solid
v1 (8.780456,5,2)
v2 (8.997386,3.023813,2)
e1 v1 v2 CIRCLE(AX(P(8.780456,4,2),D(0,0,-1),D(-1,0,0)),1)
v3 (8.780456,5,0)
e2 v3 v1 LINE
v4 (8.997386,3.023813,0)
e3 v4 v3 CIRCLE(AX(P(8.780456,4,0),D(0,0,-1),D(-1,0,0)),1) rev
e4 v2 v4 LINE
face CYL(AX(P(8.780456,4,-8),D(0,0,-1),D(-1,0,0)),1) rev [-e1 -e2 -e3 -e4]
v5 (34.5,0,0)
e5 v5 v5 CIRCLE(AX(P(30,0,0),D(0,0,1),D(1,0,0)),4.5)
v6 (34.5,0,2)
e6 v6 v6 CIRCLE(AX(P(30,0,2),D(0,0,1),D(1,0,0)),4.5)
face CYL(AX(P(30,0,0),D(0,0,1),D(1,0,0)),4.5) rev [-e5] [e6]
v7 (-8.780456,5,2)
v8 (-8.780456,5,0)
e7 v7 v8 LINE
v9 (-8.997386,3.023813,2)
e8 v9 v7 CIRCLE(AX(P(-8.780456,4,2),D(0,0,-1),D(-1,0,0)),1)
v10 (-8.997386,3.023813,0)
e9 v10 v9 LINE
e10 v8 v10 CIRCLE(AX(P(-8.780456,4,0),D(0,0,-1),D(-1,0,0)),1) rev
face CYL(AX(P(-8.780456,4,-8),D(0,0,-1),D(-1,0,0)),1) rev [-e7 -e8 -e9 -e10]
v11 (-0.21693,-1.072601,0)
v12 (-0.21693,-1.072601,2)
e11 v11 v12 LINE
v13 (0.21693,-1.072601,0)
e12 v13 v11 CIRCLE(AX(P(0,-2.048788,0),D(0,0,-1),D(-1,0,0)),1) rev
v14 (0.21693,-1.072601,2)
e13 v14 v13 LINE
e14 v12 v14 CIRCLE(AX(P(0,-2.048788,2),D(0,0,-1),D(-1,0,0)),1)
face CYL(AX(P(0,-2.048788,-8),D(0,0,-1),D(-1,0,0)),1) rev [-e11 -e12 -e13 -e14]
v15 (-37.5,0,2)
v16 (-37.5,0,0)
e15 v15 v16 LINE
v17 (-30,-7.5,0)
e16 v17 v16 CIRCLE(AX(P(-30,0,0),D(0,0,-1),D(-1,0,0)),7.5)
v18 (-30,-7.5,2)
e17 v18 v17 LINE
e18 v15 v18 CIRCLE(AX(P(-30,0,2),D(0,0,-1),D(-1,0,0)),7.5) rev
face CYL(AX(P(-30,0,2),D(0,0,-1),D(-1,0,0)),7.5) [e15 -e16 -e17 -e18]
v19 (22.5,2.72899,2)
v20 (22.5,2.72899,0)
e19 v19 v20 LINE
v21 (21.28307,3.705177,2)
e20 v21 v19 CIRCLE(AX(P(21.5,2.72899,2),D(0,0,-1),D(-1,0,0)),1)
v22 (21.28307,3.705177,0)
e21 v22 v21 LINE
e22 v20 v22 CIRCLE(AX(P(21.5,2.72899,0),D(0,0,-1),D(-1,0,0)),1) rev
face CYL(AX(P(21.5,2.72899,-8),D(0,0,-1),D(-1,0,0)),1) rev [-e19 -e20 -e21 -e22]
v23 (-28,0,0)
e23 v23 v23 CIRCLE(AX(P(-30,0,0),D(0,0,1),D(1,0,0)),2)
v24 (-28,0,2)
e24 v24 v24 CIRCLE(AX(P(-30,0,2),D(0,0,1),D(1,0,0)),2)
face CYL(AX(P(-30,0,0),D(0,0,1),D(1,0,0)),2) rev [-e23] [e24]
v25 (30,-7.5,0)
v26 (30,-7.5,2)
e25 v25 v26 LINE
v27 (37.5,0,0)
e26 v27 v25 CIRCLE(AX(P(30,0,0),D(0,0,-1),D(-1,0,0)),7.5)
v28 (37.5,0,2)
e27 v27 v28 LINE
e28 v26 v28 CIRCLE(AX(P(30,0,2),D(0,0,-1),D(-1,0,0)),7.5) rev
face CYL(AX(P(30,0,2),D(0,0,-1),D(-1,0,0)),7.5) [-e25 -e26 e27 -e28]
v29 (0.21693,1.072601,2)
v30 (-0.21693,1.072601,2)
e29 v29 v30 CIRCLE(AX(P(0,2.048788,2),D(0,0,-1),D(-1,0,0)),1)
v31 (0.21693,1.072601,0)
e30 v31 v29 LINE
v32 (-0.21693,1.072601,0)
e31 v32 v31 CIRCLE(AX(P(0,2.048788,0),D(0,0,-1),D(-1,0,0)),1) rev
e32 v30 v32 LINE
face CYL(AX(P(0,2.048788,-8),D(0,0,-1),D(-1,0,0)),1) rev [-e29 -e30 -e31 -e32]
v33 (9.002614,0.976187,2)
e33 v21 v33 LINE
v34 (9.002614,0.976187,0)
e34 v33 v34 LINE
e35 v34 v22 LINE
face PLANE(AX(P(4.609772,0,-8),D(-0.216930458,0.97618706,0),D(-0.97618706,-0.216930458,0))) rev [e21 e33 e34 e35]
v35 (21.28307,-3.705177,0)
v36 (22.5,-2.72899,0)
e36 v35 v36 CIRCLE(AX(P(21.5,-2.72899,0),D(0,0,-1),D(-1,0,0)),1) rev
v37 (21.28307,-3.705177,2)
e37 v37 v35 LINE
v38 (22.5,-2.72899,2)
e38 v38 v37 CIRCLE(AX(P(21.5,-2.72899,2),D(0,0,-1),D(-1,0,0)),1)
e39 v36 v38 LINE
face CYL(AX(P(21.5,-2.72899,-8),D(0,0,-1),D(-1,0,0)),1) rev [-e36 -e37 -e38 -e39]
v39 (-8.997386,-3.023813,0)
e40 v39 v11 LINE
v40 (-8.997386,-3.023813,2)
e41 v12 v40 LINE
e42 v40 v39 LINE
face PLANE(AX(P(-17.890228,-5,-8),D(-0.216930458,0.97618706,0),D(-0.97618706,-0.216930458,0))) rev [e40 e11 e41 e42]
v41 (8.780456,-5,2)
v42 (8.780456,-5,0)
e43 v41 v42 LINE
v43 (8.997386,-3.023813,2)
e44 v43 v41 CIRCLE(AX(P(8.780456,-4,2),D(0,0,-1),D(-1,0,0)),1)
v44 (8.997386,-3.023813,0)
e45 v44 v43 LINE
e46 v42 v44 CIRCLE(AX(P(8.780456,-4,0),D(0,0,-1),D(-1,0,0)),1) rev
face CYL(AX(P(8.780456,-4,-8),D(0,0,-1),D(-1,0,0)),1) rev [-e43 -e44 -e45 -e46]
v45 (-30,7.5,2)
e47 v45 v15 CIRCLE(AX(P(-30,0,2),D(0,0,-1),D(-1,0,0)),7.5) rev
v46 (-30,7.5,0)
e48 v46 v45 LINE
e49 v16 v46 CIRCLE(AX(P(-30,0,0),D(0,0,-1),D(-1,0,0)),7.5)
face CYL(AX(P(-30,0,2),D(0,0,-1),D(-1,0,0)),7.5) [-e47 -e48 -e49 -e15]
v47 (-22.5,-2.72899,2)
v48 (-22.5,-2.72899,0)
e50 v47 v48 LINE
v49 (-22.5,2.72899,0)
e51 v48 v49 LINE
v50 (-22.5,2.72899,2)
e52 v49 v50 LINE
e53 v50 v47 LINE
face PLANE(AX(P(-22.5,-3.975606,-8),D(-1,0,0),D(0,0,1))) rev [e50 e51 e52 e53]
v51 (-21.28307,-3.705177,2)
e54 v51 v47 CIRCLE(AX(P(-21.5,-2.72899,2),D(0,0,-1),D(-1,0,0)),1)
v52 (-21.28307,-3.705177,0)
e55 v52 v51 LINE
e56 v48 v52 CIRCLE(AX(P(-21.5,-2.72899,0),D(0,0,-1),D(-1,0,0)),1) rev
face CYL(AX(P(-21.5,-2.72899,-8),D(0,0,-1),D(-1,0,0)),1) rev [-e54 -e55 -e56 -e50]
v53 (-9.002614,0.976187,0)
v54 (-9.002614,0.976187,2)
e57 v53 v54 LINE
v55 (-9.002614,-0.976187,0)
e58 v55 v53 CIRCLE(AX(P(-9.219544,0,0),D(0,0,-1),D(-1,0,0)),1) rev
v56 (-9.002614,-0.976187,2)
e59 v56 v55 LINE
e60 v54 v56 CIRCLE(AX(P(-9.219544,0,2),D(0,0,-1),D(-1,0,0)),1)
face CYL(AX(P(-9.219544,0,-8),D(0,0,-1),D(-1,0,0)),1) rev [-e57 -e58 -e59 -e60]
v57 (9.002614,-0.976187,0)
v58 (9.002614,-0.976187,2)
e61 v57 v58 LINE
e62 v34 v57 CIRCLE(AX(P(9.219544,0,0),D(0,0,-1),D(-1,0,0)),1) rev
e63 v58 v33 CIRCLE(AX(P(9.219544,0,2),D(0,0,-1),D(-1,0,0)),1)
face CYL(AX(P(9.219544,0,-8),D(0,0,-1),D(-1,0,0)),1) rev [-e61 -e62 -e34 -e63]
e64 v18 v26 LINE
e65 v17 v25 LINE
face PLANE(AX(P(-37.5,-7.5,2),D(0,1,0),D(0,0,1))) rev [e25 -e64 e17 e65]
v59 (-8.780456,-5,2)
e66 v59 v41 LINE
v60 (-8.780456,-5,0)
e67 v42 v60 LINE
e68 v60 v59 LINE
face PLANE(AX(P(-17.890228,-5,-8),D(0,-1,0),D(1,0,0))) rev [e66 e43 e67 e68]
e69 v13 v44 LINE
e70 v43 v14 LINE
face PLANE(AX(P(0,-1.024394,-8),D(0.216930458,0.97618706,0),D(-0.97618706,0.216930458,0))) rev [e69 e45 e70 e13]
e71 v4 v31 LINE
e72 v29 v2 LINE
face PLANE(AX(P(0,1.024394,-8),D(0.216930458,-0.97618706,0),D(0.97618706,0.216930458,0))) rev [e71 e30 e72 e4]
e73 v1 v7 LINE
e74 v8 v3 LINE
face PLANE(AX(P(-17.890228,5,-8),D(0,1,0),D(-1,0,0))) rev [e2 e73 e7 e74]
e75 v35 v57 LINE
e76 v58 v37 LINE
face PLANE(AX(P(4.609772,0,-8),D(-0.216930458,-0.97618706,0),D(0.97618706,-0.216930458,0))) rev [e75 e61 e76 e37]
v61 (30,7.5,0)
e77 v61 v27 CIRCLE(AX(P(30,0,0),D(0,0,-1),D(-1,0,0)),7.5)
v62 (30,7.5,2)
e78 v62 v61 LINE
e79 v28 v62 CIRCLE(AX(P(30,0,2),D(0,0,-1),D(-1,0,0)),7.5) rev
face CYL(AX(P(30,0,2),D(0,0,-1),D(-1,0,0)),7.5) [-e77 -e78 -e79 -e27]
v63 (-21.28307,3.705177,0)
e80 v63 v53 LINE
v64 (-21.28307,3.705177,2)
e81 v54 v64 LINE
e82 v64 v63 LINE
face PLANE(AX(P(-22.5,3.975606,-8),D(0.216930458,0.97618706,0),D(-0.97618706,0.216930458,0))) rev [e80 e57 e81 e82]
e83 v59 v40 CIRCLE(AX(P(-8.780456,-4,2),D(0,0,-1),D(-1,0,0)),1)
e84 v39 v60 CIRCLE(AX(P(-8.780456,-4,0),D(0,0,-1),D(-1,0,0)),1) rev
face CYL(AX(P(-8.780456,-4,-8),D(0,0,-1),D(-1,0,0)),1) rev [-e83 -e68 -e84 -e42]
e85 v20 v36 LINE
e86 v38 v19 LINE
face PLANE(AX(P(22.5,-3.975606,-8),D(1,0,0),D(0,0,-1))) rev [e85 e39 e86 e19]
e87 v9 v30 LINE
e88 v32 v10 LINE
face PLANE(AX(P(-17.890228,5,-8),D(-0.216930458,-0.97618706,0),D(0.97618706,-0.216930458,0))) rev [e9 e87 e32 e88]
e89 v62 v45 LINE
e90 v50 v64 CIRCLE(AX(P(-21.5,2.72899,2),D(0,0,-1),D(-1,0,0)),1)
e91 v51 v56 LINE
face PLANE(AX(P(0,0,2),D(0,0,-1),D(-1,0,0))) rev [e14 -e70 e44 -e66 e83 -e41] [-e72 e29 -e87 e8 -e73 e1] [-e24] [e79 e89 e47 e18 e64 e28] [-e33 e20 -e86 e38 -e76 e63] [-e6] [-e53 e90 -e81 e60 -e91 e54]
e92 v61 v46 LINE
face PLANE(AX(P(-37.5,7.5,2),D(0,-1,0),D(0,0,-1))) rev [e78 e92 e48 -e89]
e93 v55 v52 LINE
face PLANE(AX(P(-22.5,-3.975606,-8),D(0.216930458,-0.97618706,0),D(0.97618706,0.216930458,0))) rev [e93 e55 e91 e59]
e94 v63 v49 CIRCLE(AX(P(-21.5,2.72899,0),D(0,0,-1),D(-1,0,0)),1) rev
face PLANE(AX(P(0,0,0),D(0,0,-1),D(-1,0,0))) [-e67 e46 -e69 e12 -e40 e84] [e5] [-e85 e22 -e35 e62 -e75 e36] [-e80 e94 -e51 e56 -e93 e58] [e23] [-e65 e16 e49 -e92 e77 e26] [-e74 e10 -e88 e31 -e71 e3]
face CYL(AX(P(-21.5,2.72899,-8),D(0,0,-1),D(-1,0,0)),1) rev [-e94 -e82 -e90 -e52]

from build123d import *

# Parameters (mm, degrees)
SKETCH_1_W          = 75
SKETCH_1_H          = 15
EXTRUDE_1_DEPTH     = 2
FILLET_1_R          = 7.5
SKETCH_2_R          = 4.5
SKETCH_2_R_2        = 2
CUT_EXTRUDE_1_DEPTH = 2
CUT_EXTRUDE_3_DEPTH = 10
FILLET_5_R          = 1


with BuildPart() as part:
    # 草图1 → 凸台-拉伸1 (new body)
    with BuildSketch(Plane.XY):
        Rectangle(SKETCH_1_W, SKETCH_1_H)
    extrude(amount=EXTRUDE_1_DEPTH)

    # 圆角1
    fillet_1_edges = [part.edges().sort_by_distance(p)[0] for p in [
        (37.5, -7.5, 1),
        (-37.5, -7.5, 1),
        (-37.5, 7.5, 1),
        (37.5, 7.5, 1),
    ]]
    fillet(fillet_1_edges, radius=FILLET_1_R - 0.0001)  # a hair under: the kernel refuses the full size

    # 草图2 → 切除-拉伸1 (cut)
    with BuildSketch(Plane.XY.offset(2)):
        with Locations((30, 0)):
            Circle(SKETCH_2_R)
        with Locations((-30, 0)):
            Circle(SKETCH_2_R_2)
    extrude(amount=-CUT_EXTRUDE_1_DEPTH, mode=Mode.SUBTRACT)

    # 草图3 → 切除-拉伸3 (cut)
    with BuildSketch(Plane.XY.offset(2)):
        Polygon((-17.890227771, -5), (0, -1.024393829), (17.890227771, -5), align=None)
        Polygon((-22.5, -3.975606171), (-22.5, 3.975606171), (-4.609772229, 0), align=None)
        Polygon((-17.890227771, 5), (17.890227771, 5), (0, 1.024393829), align=None)
        Polygon((22.5, -3.975606171), (22.5, 3.975606171), (4.609772229, 0), align=None)
    extrude(amount=-CUT_EXTRUDE_3_DEPTH, mode=Mode.SUBTRACT)

    # 圆角5
    fillet_5_edges = [part.edges().sort_by_distance(p)[0] for p in [
        (0, 1.024393829, 1),
        (-17.890227771, 5, 1),
        (17.890227771, 5, 1),
        (4.609772229, 0, 1),
        (22.5, 3.975606171, 1),
        (22.5, -3.975606171, 1),
        (0, -1.024393829, 1),
        (17.890227771, -5, 1),
        (-17.890227771, -5, 1),
        (-22.5, 3.975606171, 1),
        (-4.609772229, 0, 1),
        (-22.5, -3.975606171, 1),
    ]]
    fillet(fillet_5_edges, radius=FILLET_5_R)


solid = part.part
